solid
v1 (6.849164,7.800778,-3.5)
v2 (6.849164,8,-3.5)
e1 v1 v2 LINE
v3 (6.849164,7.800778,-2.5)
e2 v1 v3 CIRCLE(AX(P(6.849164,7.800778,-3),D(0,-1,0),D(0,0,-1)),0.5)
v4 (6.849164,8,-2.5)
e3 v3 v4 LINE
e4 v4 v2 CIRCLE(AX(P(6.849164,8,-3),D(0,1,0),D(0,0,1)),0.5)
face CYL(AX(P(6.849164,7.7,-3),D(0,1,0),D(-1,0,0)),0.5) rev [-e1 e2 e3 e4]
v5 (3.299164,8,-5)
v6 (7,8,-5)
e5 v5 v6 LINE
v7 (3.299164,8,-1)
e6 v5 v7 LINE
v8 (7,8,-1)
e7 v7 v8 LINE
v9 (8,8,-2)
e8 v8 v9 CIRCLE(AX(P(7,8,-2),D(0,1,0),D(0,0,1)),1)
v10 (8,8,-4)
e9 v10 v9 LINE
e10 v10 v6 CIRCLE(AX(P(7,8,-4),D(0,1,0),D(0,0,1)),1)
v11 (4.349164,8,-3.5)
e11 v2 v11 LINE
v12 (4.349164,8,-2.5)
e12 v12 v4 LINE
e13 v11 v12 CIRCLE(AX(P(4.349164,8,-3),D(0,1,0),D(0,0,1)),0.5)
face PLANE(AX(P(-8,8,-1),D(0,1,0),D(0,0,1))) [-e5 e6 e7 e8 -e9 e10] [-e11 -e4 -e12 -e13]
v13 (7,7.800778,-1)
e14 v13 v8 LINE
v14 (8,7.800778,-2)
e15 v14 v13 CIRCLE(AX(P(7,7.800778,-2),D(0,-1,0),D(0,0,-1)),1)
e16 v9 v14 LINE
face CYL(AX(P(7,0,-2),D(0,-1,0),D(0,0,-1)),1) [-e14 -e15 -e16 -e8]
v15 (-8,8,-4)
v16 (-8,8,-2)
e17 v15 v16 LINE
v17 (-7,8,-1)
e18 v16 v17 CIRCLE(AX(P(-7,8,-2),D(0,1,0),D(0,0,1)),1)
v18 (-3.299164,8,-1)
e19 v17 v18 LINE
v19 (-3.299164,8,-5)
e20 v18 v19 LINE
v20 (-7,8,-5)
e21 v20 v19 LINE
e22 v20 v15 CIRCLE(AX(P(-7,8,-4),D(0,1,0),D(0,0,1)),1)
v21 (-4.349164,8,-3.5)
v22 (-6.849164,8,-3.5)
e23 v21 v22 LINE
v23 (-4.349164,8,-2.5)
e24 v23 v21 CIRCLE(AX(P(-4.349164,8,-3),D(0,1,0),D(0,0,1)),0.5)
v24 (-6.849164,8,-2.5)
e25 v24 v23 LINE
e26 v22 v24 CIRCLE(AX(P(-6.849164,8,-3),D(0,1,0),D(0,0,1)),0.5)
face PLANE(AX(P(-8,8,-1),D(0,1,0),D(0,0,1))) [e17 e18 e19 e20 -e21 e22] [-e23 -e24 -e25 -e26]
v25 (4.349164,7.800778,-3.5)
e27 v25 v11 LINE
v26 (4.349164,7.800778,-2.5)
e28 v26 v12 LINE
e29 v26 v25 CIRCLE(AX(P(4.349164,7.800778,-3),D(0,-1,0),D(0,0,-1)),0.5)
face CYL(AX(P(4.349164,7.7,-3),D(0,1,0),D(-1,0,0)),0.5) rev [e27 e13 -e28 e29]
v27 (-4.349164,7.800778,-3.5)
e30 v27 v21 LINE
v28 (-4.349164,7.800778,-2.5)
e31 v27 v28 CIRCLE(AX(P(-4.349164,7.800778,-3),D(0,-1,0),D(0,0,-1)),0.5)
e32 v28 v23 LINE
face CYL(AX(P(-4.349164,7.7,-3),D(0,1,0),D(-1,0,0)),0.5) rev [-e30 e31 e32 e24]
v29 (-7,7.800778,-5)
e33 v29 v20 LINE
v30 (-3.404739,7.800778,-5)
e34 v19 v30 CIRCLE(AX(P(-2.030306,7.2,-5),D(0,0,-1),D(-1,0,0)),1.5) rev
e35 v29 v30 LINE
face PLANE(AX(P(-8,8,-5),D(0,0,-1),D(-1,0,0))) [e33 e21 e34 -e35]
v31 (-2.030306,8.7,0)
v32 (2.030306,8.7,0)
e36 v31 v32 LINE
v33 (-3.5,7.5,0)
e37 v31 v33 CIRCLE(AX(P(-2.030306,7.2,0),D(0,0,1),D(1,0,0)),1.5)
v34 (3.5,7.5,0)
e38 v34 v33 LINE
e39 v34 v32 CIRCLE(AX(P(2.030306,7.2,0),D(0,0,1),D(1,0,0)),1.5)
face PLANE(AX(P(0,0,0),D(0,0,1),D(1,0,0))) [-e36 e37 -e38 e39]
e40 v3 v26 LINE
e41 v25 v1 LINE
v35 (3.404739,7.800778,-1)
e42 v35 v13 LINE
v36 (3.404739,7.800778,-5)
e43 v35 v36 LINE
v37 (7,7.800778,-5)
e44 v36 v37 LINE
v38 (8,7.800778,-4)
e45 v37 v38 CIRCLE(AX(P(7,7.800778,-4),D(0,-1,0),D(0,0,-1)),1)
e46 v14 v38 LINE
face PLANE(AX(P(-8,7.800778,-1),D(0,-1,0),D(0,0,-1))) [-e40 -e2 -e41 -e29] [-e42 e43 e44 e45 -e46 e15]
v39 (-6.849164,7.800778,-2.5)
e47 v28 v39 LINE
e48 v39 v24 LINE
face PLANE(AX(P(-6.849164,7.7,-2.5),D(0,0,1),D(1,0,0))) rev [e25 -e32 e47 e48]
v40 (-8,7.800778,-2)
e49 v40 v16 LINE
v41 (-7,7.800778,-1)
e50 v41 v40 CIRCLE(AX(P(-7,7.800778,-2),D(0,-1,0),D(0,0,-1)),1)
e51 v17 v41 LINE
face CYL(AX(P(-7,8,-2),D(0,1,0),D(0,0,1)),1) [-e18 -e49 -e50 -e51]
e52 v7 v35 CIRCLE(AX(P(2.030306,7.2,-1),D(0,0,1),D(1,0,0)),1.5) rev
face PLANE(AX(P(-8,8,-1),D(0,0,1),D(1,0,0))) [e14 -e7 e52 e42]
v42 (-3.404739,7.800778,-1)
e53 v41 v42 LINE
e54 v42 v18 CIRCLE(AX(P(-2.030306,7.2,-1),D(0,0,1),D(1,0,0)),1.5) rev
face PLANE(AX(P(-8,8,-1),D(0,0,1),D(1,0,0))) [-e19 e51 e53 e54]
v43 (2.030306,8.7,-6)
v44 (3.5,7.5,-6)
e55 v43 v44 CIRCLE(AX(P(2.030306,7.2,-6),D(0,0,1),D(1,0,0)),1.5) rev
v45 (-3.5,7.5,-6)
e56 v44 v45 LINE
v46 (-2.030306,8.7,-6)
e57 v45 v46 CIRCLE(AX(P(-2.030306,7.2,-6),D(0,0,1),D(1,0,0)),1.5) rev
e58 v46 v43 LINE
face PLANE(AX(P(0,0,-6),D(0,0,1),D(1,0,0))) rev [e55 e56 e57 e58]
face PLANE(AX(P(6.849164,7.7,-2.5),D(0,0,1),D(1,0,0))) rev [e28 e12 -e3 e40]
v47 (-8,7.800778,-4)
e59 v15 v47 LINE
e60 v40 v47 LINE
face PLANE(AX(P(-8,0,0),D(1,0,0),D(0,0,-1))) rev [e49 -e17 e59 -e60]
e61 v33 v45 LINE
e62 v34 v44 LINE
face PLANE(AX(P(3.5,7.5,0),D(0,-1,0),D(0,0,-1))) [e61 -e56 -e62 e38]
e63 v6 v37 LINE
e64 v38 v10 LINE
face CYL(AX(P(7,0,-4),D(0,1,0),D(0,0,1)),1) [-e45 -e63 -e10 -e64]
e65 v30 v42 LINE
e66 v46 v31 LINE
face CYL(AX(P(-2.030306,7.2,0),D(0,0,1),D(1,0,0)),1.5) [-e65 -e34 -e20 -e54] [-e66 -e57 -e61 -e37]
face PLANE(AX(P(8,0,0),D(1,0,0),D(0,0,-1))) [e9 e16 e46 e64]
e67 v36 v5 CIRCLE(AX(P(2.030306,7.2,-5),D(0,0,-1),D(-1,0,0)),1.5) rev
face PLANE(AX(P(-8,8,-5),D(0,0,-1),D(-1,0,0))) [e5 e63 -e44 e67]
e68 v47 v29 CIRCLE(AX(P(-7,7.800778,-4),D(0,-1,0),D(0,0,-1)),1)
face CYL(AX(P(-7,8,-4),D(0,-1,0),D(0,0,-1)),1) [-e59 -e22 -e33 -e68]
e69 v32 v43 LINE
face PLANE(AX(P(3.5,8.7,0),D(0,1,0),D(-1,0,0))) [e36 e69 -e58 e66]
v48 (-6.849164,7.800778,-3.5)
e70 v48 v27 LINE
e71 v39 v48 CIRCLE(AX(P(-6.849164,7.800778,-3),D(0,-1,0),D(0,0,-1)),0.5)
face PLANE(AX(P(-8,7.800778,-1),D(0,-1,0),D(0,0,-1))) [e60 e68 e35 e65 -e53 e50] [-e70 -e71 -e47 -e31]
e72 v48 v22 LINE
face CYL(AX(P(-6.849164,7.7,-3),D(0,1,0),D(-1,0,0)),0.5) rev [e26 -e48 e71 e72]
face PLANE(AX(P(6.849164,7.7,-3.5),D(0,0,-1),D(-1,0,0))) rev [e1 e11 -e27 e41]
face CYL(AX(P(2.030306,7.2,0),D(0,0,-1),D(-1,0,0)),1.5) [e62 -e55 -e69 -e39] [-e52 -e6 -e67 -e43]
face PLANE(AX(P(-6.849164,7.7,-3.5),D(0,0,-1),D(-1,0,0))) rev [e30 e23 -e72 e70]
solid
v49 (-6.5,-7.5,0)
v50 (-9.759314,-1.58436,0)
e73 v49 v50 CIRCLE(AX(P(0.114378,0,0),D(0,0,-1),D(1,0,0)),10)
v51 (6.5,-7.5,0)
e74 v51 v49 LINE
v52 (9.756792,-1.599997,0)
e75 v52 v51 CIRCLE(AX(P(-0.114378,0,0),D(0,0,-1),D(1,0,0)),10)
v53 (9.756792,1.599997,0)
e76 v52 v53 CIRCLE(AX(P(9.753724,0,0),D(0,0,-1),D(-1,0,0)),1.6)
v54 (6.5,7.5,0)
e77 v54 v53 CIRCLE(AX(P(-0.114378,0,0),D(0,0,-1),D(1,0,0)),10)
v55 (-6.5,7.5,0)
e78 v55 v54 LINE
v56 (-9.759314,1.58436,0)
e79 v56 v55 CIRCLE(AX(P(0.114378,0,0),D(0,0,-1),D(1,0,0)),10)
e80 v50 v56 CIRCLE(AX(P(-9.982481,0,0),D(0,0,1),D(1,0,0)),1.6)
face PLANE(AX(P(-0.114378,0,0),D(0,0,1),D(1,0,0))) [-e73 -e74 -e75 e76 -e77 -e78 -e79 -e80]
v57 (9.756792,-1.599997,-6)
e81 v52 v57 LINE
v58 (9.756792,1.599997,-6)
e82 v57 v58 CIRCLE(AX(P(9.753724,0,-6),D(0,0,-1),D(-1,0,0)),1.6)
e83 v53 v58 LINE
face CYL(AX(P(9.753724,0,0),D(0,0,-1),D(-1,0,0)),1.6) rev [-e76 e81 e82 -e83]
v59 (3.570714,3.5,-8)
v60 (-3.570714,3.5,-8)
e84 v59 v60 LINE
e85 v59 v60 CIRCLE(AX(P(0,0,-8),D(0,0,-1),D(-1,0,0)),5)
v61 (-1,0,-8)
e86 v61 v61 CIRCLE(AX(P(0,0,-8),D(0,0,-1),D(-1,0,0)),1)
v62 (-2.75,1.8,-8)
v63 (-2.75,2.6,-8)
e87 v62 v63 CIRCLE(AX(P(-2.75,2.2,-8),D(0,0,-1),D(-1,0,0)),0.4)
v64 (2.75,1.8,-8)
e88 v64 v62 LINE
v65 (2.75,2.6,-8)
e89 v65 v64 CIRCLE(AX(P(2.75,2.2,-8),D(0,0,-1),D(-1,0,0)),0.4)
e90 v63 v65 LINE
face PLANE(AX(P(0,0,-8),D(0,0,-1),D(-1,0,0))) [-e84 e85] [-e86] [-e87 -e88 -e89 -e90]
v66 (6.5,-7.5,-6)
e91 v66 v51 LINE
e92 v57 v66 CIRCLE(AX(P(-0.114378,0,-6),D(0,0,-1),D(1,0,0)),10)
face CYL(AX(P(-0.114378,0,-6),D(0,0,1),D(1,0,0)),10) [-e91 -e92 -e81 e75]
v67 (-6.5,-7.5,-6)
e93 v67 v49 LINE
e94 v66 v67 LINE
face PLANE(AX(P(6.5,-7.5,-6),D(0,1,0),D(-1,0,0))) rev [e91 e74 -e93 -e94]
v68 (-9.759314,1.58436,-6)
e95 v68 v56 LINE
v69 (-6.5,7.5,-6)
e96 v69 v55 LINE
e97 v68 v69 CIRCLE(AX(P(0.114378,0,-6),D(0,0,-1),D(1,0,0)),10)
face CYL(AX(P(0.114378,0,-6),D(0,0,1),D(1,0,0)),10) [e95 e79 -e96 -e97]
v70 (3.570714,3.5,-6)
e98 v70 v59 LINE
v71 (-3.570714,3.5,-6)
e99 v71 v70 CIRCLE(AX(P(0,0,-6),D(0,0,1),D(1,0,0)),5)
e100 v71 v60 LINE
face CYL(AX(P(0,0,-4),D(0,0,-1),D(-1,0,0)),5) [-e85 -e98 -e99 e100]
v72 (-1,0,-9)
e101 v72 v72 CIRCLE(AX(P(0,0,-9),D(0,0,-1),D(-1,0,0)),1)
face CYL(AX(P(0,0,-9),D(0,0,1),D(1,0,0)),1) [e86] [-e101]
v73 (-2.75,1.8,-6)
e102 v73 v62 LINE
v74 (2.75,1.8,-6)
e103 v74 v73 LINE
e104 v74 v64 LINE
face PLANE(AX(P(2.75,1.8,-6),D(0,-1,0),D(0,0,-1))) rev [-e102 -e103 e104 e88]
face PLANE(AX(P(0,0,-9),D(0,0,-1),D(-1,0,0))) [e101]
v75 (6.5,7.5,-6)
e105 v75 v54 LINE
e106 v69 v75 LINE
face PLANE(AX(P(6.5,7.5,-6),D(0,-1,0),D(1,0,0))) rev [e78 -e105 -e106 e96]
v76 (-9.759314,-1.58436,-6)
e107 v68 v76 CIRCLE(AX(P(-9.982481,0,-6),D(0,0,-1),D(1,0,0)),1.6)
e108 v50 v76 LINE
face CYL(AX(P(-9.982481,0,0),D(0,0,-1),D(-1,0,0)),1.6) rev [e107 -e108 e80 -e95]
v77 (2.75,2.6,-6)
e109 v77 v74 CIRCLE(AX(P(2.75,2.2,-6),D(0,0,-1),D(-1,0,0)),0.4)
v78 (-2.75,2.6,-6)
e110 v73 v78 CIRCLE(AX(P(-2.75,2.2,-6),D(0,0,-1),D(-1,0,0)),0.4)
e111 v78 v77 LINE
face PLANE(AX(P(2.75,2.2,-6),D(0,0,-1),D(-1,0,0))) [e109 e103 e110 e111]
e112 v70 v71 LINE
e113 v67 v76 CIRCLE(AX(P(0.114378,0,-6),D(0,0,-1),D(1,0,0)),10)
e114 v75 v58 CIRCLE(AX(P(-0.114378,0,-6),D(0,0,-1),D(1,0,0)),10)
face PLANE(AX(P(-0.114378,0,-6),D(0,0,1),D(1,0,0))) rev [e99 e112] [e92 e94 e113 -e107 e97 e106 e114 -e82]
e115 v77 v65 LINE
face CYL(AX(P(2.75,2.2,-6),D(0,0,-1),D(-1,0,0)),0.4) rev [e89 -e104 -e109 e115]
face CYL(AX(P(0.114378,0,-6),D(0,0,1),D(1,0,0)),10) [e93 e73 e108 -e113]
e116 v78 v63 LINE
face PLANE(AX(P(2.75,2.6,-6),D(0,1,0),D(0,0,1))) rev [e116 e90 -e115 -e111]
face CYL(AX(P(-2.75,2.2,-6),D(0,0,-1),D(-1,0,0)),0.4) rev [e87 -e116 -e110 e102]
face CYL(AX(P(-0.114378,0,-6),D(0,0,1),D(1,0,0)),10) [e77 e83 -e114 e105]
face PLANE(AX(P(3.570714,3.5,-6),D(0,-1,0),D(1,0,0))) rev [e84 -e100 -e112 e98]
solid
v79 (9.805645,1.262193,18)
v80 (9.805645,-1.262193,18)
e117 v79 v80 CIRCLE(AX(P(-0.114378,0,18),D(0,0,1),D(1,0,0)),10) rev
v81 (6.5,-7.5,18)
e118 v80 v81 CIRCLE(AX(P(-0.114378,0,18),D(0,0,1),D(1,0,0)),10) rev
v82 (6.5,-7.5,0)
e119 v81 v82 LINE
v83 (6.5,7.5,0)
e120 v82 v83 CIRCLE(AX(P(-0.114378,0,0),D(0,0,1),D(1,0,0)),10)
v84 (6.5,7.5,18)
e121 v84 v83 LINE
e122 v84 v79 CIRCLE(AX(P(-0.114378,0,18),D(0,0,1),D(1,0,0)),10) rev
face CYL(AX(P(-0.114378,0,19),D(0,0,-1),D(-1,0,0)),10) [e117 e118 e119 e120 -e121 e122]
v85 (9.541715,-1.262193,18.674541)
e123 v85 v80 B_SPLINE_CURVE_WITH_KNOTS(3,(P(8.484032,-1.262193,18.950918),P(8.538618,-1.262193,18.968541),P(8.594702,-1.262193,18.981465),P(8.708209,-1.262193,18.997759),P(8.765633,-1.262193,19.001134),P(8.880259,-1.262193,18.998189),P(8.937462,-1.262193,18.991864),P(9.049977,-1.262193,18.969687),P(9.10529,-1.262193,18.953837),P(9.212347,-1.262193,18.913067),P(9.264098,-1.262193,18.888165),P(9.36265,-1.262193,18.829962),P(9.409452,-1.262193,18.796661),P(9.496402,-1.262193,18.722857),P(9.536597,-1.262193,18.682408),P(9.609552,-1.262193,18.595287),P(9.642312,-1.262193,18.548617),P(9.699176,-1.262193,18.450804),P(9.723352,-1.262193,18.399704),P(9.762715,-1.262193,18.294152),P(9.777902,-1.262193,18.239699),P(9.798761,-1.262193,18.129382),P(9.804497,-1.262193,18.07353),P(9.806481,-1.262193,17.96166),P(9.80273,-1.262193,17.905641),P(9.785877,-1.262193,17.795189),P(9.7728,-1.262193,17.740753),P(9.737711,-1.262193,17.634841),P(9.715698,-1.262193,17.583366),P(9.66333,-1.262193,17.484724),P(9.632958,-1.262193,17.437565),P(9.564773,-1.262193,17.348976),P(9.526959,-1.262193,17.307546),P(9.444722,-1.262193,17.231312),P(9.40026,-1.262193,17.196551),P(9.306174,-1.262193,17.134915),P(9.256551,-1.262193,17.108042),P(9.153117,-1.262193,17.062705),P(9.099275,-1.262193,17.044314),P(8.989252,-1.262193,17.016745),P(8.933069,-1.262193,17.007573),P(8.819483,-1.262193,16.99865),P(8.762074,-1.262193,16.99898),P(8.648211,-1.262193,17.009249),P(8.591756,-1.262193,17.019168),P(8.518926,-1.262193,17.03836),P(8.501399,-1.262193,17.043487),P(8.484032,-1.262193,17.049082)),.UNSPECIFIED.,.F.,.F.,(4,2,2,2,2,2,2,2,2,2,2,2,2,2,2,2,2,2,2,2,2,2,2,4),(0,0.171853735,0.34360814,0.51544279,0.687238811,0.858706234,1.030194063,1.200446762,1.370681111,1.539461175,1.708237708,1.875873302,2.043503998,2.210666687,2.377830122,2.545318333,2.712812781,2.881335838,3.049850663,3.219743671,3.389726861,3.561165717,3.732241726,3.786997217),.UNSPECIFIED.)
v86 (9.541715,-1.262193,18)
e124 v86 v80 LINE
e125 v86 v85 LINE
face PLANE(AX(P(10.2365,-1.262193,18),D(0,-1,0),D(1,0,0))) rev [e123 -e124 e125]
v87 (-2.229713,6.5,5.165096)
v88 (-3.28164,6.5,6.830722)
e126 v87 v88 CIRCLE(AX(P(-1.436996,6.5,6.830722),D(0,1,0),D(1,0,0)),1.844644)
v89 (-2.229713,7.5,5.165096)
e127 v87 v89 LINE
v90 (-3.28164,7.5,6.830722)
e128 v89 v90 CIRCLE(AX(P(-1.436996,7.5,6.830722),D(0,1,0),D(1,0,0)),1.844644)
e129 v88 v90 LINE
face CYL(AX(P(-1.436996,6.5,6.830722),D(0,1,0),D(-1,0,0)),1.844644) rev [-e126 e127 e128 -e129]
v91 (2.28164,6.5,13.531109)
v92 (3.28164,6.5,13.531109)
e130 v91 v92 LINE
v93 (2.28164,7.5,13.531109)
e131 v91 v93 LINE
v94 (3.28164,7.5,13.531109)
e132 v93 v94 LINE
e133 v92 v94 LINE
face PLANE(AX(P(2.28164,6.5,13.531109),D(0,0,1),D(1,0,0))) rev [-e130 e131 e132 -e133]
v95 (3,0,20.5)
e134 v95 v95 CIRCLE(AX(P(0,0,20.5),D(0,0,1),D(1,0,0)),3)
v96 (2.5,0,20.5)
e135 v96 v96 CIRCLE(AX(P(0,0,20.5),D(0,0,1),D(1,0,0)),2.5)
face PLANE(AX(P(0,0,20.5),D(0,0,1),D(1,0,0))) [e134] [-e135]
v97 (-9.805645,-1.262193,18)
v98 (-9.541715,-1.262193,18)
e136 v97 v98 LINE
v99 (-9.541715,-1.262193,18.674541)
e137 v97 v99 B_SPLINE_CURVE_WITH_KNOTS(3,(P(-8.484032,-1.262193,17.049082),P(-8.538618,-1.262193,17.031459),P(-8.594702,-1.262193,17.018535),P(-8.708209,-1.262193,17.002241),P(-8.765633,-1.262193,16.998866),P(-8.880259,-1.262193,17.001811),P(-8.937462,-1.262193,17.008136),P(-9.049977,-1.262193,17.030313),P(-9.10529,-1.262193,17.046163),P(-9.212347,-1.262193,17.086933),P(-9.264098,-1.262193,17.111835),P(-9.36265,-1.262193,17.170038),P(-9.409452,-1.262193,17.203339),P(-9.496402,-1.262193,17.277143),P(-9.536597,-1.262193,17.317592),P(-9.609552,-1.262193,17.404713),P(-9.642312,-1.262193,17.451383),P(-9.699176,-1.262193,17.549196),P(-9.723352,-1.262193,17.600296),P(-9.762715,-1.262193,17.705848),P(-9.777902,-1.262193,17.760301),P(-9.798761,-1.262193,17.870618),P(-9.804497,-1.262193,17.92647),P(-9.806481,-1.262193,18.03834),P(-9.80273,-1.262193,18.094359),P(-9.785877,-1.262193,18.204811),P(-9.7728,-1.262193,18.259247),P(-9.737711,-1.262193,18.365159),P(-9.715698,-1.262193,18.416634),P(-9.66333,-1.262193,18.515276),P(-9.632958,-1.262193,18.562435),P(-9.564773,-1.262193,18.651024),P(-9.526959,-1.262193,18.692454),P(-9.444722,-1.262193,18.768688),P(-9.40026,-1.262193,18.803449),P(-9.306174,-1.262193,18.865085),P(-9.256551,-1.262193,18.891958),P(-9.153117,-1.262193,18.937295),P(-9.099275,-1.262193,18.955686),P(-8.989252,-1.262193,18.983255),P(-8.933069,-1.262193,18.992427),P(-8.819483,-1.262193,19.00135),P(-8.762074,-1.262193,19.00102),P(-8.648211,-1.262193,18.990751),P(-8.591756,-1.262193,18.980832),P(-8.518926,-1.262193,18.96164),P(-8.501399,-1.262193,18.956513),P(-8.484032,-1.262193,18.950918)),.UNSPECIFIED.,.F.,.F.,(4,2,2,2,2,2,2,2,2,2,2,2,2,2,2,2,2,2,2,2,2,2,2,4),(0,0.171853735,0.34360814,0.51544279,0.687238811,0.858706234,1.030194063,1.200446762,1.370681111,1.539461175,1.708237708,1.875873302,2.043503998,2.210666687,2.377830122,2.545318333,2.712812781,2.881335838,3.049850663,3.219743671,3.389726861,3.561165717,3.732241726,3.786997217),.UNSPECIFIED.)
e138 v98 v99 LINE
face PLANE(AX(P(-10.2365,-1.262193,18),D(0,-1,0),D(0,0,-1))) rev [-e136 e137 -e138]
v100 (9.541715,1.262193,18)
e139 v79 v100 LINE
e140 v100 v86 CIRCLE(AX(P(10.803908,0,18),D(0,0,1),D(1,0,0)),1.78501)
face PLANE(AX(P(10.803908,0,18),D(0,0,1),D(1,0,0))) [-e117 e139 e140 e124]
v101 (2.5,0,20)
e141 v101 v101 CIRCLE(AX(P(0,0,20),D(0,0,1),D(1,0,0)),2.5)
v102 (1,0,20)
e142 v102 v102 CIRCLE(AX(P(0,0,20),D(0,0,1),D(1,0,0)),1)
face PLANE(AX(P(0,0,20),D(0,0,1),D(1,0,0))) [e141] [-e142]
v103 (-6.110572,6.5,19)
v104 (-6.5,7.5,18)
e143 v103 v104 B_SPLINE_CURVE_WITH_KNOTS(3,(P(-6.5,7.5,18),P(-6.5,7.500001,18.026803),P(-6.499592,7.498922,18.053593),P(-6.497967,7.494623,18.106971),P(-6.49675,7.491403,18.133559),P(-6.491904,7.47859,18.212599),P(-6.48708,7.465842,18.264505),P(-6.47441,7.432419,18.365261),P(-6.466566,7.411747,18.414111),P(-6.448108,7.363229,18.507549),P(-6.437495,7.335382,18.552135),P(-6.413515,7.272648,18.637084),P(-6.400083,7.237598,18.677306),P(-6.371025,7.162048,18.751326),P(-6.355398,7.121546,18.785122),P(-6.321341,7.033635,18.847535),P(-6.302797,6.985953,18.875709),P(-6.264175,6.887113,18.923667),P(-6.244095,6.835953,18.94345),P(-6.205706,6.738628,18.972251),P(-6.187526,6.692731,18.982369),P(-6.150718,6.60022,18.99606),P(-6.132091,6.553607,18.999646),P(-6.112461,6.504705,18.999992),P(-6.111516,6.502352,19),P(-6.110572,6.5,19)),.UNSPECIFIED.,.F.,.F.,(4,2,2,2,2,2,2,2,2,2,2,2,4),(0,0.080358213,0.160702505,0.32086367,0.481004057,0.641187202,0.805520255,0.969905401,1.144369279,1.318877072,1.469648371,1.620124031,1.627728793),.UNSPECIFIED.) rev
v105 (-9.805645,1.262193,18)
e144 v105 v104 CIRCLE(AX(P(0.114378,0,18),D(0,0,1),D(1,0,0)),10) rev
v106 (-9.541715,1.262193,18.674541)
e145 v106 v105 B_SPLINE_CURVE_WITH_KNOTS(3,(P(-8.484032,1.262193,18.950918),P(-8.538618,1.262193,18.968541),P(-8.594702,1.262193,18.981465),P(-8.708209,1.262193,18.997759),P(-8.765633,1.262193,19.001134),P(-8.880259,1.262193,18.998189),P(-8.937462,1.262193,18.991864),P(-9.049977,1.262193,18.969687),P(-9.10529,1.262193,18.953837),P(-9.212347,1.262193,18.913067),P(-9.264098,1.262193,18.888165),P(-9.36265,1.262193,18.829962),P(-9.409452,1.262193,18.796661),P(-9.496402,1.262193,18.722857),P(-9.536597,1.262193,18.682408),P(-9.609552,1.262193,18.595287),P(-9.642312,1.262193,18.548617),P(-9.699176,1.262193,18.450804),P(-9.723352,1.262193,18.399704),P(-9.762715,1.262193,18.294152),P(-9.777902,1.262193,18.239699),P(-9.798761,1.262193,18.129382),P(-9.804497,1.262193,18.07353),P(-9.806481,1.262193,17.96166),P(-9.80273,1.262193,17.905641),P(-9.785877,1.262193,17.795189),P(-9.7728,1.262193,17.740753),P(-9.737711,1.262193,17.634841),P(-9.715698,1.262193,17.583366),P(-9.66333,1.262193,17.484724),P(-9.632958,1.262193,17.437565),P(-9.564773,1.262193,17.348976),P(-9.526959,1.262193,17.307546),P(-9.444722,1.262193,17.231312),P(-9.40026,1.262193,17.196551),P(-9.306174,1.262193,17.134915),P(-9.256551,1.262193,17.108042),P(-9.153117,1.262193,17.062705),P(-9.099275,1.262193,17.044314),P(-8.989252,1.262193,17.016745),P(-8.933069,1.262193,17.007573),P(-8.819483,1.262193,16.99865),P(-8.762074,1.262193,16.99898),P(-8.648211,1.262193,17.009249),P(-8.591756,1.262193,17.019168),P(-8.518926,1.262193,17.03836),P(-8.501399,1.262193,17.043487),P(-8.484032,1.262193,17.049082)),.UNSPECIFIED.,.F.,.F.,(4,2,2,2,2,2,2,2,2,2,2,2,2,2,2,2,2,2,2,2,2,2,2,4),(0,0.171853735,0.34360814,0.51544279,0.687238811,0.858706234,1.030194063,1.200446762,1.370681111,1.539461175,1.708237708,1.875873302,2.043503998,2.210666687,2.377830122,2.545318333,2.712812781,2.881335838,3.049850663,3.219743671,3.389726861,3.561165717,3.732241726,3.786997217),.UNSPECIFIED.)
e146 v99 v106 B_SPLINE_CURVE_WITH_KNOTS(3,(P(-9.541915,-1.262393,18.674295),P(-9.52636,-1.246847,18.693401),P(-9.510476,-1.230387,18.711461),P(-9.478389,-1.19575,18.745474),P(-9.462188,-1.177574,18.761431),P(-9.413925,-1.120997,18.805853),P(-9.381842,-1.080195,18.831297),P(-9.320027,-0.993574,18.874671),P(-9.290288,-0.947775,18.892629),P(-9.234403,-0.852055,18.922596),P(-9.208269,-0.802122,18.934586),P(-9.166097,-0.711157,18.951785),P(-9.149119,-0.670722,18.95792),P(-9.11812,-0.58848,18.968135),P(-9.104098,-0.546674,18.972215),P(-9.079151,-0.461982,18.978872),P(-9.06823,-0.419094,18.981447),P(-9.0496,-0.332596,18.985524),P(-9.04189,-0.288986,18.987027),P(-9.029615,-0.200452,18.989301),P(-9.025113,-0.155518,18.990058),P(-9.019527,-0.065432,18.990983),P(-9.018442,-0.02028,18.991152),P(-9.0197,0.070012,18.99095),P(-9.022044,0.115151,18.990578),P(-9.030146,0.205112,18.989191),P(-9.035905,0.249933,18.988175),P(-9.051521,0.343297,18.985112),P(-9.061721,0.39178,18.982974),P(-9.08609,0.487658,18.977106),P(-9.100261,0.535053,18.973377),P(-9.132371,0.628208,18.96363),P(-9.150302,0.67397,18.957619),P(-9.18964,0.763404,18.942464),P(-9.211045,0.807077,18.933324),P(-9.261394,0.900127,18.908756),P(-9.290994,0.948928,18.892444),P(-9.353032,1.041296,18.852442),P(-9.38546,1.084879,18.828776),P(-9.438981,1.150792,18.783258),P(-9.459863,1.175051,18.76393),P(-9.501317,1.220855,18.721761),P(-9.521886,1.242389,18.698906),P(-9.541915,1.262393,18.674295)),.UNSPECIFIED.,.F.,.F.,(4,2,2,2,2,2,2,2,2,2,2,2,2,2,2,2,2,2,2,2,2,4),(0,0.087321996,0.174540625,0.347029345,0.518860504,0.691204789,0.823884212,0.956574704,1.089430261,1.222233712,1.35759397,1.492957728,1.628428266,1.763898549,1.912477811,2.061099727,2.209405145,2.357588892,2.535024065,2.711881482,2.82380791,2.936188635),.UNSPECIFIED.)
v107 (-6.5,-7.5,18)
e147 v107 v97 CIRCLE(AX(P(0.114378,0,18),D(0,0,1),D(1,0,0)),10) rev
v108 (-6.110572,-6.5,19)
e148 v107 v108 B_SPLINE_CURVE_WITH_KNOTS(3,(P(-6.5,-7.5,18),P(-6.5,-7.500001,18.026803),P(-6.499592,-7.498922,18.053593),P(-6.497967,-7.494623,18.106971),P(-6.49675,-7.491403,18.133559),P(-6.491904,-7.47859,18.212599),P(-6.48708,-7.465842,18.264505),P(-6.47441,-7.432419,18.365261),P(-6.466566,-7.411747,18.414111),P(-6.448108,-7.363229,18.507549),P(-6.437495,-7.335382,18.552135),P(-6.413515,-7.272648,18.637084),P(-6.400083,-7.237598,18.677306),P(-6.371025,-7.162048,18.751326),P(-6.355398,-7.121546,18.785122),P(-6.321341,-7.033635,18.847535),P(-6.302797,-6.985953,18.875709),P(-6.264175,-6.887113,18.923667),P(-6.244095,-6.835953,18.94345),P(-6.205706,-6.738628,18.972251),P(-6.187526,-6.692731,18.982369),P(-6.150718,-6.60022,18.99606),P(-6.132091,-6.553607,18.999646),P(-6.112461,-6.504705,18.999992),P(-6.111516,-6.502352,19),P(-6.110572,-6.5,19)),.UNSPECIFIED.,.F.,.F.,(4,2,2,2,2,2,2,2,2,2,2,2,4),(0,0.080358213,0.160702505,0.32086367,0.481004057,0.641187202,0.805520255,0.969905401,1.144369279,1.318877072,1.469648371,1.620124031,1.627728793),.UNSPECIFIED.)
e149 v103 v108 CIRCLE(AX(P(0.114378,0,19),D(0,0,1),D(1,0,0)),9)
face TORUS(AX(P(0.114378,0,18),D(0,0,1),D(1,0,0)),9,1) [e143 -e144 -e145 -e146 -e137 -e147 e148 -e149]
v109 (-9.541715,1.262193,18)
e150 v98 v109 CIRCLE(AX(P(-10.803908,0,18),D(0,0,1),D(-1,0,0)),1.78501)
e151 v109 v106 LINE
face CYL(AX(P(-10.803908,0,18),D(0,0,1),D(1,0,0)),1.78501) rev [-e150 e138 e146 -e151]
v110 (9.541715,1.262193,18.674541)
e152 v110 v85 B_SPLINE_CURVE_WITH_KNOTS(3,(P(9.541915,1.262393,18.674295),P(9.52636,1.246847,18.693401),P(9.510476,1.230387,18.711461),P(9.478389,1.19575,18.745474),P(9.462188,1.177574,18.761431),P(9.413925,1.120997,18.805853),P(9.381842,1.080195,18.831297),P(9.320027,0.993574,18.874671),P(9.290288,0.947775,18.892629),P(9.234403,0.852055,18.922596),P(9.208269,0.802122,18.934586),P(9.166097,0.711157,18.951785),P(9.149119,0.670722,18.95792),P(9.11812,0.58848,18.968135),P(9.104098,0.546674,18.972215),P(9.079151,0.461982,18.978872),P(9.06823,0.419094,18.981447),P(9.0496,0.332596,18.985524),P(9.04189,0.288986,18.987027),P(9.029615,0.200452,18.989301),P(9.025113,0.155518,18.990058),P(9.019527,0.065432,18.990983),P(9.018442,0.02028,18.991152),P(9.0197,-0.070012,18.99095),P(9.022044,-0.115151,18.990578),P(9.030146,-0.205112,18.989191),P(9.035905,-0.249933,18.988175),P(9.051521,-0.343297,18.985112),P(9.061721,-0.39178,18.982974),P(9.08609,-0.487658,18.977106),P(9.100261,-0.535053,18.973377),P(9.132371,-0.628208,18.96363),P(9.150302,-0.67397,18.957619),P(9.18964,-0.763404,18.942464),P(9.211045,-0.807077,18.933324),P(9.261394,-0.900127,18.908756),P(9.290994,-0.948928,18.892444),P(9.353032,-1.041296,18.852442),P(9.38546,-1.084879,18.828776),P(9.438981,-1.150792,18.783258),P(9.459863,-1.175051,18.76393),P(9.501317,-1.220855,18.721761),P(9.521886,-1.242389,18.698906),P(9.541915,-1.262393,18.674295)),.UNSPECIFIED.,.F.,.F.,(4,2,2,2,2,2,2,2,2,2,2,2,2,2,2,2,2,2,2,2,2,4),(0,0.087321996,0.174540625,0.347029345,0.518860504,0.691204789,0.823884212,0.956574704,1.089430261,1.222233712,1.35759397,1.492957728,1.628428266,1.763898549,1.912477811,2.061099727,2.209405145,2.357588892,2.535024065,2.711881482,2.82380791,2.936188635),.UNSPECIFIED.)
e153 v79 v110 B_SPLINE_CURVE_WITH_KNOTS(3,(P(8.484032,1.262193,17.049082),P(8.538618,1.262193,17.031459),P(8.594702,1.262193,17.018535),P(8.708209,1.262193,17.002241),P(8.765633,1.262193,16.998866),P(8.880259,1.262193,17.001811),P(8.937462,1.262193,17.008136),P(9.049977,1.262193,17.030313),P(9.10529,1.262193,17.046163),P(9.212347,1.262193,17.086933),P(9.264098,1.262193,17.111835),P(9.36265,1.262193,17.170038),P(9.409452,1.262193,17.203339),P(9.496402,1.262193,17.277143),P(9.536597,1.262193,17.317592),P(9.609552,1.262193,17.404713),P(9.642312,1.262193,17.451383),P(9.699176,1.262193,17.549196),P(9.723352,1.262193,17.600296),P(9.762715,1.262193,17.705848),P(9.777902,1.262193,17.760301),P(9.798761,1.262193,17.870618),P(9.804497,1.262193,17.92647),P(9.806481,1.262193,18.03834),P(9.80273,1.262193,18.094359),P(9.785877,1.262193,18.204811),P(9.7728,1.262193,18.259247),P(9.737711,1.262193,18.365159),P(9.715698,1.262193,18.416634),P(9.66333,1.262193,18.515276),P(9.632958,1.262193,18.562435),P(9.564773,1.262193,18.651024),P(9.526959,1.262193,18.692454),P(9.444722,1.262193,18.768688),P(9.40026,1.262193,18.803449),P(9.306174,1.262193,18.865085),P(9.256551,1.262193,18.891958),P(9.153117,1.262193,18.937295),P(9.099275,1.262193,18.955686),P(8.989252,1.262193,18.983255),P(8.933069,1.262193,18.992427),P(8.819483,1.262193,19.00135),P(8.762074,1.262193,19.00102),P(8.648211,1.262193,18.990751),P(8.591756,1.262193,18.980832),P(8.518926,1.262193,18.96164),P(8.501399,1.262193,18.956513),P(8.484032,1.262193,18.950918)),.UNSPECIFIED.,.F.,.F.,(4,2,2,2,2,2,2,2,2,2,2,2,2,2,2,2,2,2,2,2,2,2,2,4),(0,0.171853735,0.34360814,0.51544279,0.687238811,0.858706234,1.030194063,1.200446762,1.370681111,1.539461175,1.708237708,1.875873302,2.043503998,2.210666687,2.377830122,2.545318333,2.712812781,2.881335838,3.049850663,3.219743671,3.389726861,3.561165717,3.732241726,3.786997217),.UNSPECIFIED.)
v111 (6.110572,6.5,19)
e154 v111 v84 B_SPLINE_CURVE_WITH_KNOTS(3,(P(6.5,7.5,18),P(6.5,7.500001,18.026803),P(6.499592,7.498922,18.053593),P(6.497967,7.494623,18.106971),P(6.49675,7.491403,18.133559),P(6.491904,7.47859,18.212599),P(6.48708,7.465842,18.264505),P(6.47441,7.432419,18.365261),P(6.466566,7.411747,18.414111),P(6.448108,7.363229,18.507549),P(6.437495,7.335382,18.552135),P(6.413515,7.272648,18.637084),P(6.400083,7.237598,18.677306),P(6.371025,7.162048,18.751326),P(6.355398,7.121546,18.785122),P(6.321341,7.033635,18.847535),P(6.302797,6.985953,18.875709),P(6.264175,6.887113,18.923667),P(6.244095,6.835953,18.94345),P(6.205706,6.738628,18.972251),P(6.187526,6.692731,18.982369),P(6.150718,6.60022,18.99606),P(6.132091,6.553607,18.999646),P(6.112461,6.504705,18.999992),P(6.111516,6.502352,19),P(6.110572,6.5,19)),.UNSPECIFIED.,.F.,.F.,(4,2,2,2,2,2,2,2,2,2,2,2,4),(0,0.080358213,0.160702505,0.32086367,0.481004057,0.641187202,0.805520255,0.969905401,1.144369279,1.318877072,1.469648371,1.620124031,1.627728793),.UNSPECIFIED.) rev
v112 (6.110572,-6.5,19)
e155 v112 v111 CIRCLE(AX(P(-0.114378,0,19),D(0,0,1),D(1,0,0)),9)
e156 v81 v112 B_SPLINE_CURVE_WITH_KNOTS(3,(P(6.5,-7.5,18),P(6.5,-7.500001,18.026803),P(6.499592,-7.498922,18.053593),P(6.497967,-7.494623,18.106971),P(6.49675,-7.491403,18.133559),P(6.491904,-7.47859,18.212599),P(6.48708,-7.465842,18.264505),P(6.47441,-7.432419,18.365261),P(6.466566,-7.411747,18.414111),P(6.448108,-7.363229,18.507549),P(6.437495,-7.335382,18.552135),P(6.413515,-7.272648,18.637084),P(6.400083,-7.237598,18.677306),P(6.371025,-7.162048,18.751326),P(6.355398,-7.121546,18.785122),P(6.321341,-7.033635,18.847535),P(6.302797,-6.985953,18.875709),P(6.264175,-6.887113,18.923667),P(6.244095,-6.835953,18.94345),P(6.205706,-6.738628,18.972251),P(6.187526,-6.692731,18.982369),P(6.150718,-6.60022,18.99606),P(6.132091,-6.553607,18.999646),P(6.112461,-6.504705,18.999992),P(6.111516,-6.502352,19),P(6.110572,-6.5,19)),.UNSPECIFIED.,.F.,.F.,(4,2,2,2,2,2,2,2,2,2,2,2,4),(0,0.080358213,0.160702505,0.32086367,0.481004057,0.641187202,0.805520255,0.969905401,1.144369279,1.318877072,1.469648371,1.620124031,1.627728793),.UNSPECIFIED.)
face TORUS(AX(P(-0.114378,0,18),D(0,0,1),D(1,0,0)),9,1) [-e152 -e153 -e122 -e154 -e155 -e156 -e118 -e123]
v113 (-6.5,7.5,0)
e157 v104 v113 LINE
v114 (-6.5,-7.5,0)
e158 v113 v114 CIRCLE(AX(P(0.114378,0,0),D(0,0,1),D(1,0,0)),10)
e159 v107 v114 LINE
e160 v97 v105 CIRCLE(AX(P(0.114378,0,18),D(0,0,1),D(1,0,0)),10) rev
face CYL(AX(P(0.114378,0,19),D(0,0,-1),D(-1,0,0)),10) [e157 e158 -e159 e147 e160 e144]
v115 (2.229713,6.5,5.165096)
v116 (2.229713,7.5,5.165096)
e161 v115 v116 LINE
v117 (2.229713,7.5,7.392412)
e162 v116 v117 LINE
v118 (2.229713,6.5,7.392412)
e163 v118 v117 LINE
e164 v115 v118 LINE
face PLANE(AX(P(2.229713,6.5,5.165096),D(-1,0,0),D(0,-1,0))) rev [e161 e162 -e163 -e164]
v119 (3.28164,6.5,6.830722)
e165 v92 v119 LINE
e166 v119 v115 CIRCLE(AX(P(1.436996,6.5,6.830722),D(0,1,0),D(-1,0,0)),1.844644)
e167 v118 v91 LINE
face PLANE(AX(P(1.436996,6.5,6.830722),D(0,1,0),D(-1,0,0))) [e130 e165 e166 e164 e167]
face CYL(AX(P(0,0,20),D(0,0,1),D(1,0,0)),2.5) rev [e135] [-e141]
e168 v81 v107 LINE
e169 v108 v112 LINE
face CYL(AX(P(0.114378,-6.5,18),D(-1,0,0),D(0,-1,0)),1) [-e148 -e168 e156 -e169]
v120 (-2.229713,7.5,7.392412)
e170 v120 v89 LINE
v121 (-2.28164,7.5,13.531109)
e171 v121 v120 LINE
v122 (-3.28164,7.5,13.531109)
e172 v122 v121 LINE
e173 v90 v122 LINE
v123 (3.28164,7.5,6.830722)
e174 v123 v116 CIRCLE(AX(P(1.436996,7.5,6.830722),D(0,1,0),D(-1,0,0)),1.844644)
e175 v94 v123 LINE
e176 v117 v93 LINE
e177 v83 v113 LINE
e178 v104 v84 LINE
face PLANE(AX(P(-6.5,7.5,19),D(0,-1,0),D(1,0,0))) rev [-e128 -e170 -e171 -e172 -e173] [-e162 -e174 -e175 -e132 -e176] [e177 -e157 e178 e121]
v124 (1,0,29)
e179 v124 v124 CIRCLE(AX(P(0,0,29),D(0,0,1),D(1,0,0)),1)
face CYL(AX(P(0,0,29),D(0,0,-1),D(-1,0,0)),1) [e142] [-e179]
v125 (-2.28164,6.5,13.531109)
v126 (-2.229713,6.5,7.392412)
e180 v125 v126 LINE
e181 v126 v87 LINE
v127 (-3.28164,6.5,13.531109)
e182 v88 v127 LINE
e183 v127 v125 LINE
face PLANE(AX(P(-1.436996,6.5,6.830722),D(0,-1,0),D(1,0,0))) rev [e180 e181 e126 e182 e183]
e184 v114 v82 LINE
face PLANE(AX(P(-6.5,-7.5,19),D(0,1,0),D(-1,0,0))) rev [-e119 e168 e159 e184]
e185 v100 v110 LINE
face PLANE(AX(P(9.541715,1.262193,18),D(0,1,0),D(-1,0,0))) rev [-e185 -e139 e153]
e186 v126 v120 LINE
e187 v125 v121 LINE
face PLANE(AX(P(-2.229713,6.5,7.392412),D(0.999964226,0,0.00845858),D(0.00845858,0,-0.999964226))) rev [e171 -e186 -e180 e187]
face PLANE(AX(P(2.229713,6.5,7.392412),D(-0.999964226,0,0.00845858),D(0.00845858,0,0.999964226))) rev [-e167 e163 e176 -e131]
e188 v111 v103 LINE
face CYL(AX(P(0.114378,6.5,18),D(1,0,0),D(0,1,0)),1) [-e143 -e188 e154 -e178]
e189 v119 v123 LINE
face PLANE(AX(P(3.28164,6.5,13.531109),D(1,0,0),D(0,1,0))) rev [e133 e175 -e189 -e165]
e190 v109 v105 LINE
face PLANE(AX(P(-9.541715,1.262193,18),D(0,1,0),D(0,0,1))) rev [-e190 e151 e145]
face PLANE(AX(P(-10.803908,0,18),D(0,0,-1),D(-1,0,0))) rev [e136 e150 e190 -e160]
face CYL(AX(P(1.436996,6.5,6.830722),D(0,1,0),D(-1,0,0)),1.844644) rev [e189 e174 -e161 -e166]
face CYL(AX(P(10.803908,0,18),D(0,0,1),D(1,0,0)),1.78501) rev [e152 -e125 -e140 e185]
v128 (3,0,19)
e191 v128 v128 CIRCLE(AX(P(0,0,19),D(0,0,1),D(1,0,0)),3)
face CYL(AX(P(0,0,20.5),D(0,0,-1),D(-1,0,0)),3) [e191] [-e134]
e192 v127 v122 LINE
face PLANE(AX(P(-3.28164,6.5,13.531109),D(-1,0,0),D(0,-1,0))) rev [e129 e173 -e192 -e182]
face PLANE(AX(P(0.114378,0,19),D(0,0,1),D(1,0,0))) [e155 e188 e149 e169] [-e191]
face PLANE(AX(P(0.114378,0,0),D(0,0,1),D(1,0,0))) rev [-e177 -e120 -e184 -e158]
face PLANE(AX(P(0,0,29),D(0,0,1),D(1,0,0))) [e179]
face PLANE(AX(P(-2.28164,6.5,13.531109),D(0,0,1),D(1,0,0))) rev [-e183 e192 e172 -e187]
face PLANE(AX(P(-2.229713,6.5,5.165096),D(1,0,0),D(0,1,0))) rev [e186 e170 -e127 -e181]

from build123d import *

# Parameters (mm, degrees)
Y_KSEKLIK_EKSTR_ZYON1_DEPTH      = 19
RADYUS1_R                        = 1
IZIM2_R                          = 3
Y_KSEKLIK_EKSTR_ZYON2_DEPTH      = 1.5
IZIM3_R                          = 2.5
KES_EKSTR_ZYON1_DEPTH            = 0.5
IZIM4_R                          = 1
Y_KSEKLIK_EKSTR_ZYON3_DEPTH      = 9
Y_KSEKLIK_EKSTR_ZYON4_DEPTH      = 6
KES_EKSTR_ZYON2_DEPTH            = 6
Y_KSEKLIK_EKSTR_ZYON5_DEPTH      = 2
Y_KSEKLIK_EKSTR_ZYON5_DEPTH_BACK = 2
IZIM7_R                          = 5
Y_KSEKLIK_EKSTR_ZYON6_START      = 1
IZIM8_R                          = 1
Y_KSEKLIK_EKSTR_ZYON6_DEPTH      = 1
KES_EKSTR_ZYON4_DEPTH            = 2
KES_EKSTR_ZYON5_DEPTH            = 2
IZIM11_W                         = 7
IZIM11_H                         = 1.2
Y_KSEKLIK_EKSTR_ZYON7_DEPTH      = 6
RADYUS6_R                        = 1.5
Y_KSEKLIK_EKSTR_ZYON9_DEPTH      = 8
Y_KSEKLIK_EKSTR_ZYON9_DEPTH_BACK = 8
IZIM14_W                         = 4
IZIM14_H                         = 0.199221602
KES_EKSTR_ZYON8_DEPTH            = 1
RADYUS8_R                        = 1
KES_EKSTR_ZYON9_DEPTH            = 1
KES_EKSTR_ZYON10_DEPTH           = 1


with BuildPart() as part:
    # Çizim1 → Yükseklik-Ekstrüzyon1 (new body)
    with BuildSketch(Plane.XY):
        with BuildLine():
            Line((-6.5, 7.5), (6.5, 7.5))
            ThreePointArc((6.5, 7.5), (9.885621722, 0), (6.5, -7.5))
            Line((6.5, -7.5), (-6.5, -7.5))
            ThreePointArc((-6.5, -7.5), (-9.885621722, 0), (-6.5, 7.5))
        make_face()
    extrude(amount=Y_KSEKLIK_EKSTR_ZYON1_DEPTH)

    # Radyus1
    radyus1_edges = [part.edges().sort_by_distance(p)[0] for p in [
        (9.885621722, 0, 19),
        (0, 7.5, 19),
        (-9.885621722, 0, 19),
        (0, -7.5, 19),
    ]]
    fillet(radyus1_edges, radius=RADYUS1_R)

    # Çizim2 → Yükseklik-Ekstrüzyon2 (add)
    with BuildSketch(Plane.XY.offset(19)):
        Circle(IZIM2_R)
    extrude(amount=Y_KSEKLIK_EKSTR_ZYON2_DEPTH)

    # Çizim3 → Kes-Ekstrüzyon1 (cut)
    with BuildSketch(Plane.XY.offset(20.5)):
        Circle(IZIM3_R)
    extrude(amount=-KES_EKSTR_ZYON1_DEPTH, mode=Mode.SUBTRACT)

    # Çizim4 → Yükseklik-Ekstrüzyon3 (add)
    with BuildSketch(Plane.XY.offset(20)):
        Circle(IZIM4_R)
    extrude(amount=Y_KSEKLIK_EKSTR_ZYON3_DEPTH)

    # Çizim16 → Kes-Ekstrüzyon9 (cut)
    with BuildSketch(Plane(origin=(0, 7.5, 0), x_dir=(1, 0, 0), z_dir=(0, 1, 0))):
        with BuildLine():
            Line((-3.281639929, -13.531109413), (-3.281639929, -6.83072225))
            ThreePointArc((-3.281639929, -6.83072225), (-2.996642201, -5.845727443), (-2.229713406, -5.165096342))
            Line((-2.229713406, -5.165096342), (-2.229713406, -7.39241151))
            Line((-2.229713406, -7.39241151), (-2.281639929, -13.531109413))
            Line((-2.281639929, -13.531109413), (-3.281639929, -13.531109413))
        make_face()
        with BuildLine():
            Line((2.281639929, -13.531109413), (3.281639929, -13.531109413))
            Line((3.281639929, -13.531109413), (3.281639929, -6.83072225))
            ThreePointArc((3.281639929, -6.83072225), (2.996642201, -5.845727443), (2.229713406, -5.165096342))
            Line((2.229713406, -5.165096342), (2.229713406, -7.39241151))
            Line((2.229713406, -7.39241151), (2.281639929, -13.531109413))
        make_face()
    extrude(amount=-KES_EKSTR_ZYON9_DEPTH, mode=Mode.SUBTRACT)

    # Çizim17 → Kes-Ekstrüzyon10 (cut)
    with BuildSketch(Plane.XY.offset(19)):
        with BuildLine():
            Line((-9.541715251, 1.262192915), (-10.236500342, 1.262192915))
            Line((-10.236500342, 1.262192915), (-10.236500342, -1.262192915))
            Line((-10.236500342, -1.262192915), (-9.541715251, -1.262192915))
            ThreePointArc((-9.541715251, -1.262192915), (-9.018897827, 0), (-9.541715251, 1.262192915))
        make_face()
        with BuildLine():
            Line((10.236500342, -1.262192915), (9.541715251, -1.262192915))
            ThreePointArc((9.541715251, -1.262192915), (9.018897827, 0), (9.541715251, 1.262192915))
            Line((9.541715251, 1.262192915), (10.236500342, 1.262192915))
            Line((10.236500342, 1.262192915), (10.236500342, -1.262192915))
        make_face()
    extrude(amount=-KES_EKSTR_ZYON10_DEPTH, mode=Mode.SUBTRACT)


with BuildPart() as body_2:
    # Çizim5 → Yükseklik-Ekstrüzyon4 (new body)
    with BuildSketch(Plane(origin=(0, 0, 0), x_dir=(-1, 0, 0), z_dir=(0, 0, -1))):
        with BuildLine():
            Line((-6.5, 7.5), (6.5, 7.5))
            ThreePointArc((6.5, 7.5), (9.885621722, 0), (6.5, -7.5))
            Line((6.5, -7.5), (-6.5, -7.5))
            ThreePointArc((-6.5, -7.5), (-9.885621722, 0), (-6.5, 7.5))
        make_face()
    extrude(amount=Y_KSEKLIK_EKSTR_ZYON4_DEPTH)

    # Çizim6 → Kes-Ekstrüzyon2 (cut)
    with BuildSketch(Plane(origin=(0, 0, -6), x_dir=(-1, 0, 0), z_dir=(0, 0, -1))):
        with BuildLine():
            ThreePointArc((-9.756792343, -1.599997058), (-8.153724068, 0), (-9.756792343, 1.599997058))
            ThreePointArc((-9.756792343, 1.599997058), (-9.885621722, 0), (-9.756792343, -1.599997058))
        make_face()
        with BuildLine():
            ThreePointArc((9.985548898, 1.599997058), (10.114378278, 0), (9.985548898, -1.599997058))
            ThreePointArc((9.985548898, -1.599997058), (8.382480624, 0), (9.985548898, 1.599997058))
        make_face()
    extrude(amount=-KES_EKSTR_ZYON2_DEPTH, mode=Mode.SUBTRACT)

    # Çizim7 → Yükseklik-Ekstrüzyon5 (add, two sides: drawn at the far end of the back side and taken through both)
    with BuildSketch(Plane(origin=(0, 0, -6), x_dir=(-1, 0, 0), z_dir=(0, 0, -1)).offset(-Y_KSEKLIK_EKSTR_ZYON5_DEPTH_BACK)):
        Circle(IZIM7_R)
    extrude(amount=Y_KSEKLIK_EKSTR_ZYON5_DEPTH + Y_KSEKLIK_EKSTR_ZYON5_DEPTH_BACK)

    # Çizim8 → Yükseklik-Ekstrüzyon6 (add)
    with BuildSketch(Plane(origin=(0, 0, -8), x_dir=(-1, 0, 0), z_dir=(0, 0, -1)).offset(Y_KSEKLIK_EKSTR_ZYON6_START)):
        Circle(IZIM8_R)
    extrude(amount=-Y_KSEKLIK_EKSTR_ZYON6_DEPTH)

    # Çizim10 → Kes-Ekstrüzyon4 (cut)
    with BuildSketch(Plane(origin=(0, 0, -8), x_dir=(-1, 0, 0), z_dir=(0, 0, -1))):
        with BuildLine():
            Line((-2.75, 2.6), (2.75, 2.6))
            ThreePointArc((2.75, 2.6), (3.15, 2.2), (2.75, 1.8))
            Line((2.75, 1.8), (-2.75, 1.8))
            ThreePointArc((-2.75, 1.8), (-3.15, 2.2), (-2.75, 2.6))
        make_face()
    extrude(amount=-KES_EKSTR_ZYON4_DEPTH, mode=Mode.SUBTRACT)

    # Çizim9 → Kes-Ekstrüzyon5 (cut)
    with BuildSketch(Plane(origin=(0, 0, -8), x_dir=(-1, 0, 0), z_dir=(0, 0, -1))):
        with BuildLine():
            Line((-3.570714214, 3.5), (3.570714214, 3.5))
            ThreePointArc((3.570714214, 3.5), (0, 5), (-3.570714214, 3.5))
        make_face()
    extrude(amount=-KES_EKSTR_ZYON5_DEPTH, mode=Mode.SUBTRACT)


with BuildPart() as body_3:
    # Çizim11 → Yükseklik-Ekstrüzyon7 (new body)
    with BuildSketch(Plane(origin=(0, 0, -6), x_dir=(-1, 0, 0), z_dir=(0, 0, -1))):
        with Locations((0, 8.1)):
            Rectangle(IZIM11_W, IZIM11_H)
    extrude(amount=-Y_KSEKLIK_EKSTR_ZYON7_DEPTH)

    # Radyus6
    # the kernel refuses this fillet: 1.5 mm, written as the material it takes off along each edge
    with BuildSketch(Plane(origin=(-3.5, 8.7, -9.674234614), x_dir=(1.5657845390625173e-12, -1.0, 0), z_dir=(0, 0, 1))) as radyus6_piece_1:
        with BuildLine():
            CenterArc((1.5, 1.469693846), RADYUS6_R, 180, 78.463040967)
            Line((0, 1.469693846), (-0.03, 1.469693846))
            Line((-0.03, 1.469693846), (-0.03, 0))
            Line((-0.03, 0), (0, -0.03))
            ThreePointArc((0, -0.03), (0.6, -0.03), (1.194, -0.029393877))
            Line((1.194, -0.029393877), (1.2, 0))
        make_face()
    extrude(amount=13.348469228, mode=Mode.SUBTRACT)
    with BuildSketch(Plane(origin=(3.5, 8.7, -9.674234614), x_dir=(-1, 0, 0), z_dir=(0, 0, 1))) as radyus6_piece_2:
        with BuildLine():
            CenterArc((1.469693846, 1.5), RADYUS6_R, 191.536959033, 78.463040967)
            Line((0, 1.2), (-0.029393877, 1.194))
            ThreePointArc((-0.029393877, 1.194), (-0.03, 0.6), (-0.03, 0))
            Line((-0.03, 0), (0, -0.03))
            Line((0, -0.03), (1.469693846, -0.03))
            Line((1.469693846, -0.03), (1.469693846, 0))
        make_face()
    extrude(amount=13.348469228, mode=Mode.SUBTRACT)

    # Çizim14 → Yükseklik-Ekstrüzyon9 (add, two sides: drawn at the far end of the back side and taken through both)
    with BuildSketch(Plane(origin=(0, 0, 0), x_dir=(0, 0, -1), z_dir=(1, 0, 0)).offset(-Y_KSEKLIK_EKSTR_ZYON9_DEPTH_BACK)):
        with Locations((3, 7.900389199)):
            Rectangle(IZIM14_W, IZIM14_H)
    extrude(amount=Y_KSEKLIK_EKSTR_ZYON9_DEPTH + Y_KSEKLIK_EKSTR_ZYON9_DEPTH_BACK)

    # Çizim15 → Kes-Ekstrüzyon8 (cut)
    with BuildSketch(Plane(origin=(0, 8.7, 0), x_dir=(1, 0, 0), z_dir=(0, 1, 0))):
        with BuildLine():
            Line((-6.849163908, 3.5), (-4.349163908, 3.5))
            ThreePointArc((-4.349163908, 3.5), (-3.849163908, 3), (-4.349163908, 2.5))
            Line((-4.349163908, 2.5), (-6.849163908, 2.5))
            ThreePointArc((-6.849163908, 2.5), (-7.349163908, 3), (-6.849163908, 3.5))
        make_face()
        with BuildLine():
            Line((6.849163908, 3.5), (4.349163908, 3.5))
            ThreePointArc((4.349163908, 3.5), (3.849163908, 3), (4.349163908, 2.5))
            Line((4.349163908, 2.5), (6.849163908, 2.5))
            ThreePointArc((6.849163908, 2.5), (7.349163908, 3), (6.849163908, 3.5))
        make_face()
    extrude(amount=-KES_EKSTR_ZYON8_DEPTH, mode=Mode.SUBTRACT)

    # Radyus8
    radyus8_edges = [body_3.edges().sort_by_distance(p)[0] for p in [
        (-8, 7.900389199, -1),
        (-8, 7.900389199, -5),
        (8, 7.900389199, -1),
        (8, 7.900389199, -5),
    ]]
    fillet(radyus8_edges, radius=RADYUS8_R)


solid = Compound([part.part, body_2.part, body_3.part])
